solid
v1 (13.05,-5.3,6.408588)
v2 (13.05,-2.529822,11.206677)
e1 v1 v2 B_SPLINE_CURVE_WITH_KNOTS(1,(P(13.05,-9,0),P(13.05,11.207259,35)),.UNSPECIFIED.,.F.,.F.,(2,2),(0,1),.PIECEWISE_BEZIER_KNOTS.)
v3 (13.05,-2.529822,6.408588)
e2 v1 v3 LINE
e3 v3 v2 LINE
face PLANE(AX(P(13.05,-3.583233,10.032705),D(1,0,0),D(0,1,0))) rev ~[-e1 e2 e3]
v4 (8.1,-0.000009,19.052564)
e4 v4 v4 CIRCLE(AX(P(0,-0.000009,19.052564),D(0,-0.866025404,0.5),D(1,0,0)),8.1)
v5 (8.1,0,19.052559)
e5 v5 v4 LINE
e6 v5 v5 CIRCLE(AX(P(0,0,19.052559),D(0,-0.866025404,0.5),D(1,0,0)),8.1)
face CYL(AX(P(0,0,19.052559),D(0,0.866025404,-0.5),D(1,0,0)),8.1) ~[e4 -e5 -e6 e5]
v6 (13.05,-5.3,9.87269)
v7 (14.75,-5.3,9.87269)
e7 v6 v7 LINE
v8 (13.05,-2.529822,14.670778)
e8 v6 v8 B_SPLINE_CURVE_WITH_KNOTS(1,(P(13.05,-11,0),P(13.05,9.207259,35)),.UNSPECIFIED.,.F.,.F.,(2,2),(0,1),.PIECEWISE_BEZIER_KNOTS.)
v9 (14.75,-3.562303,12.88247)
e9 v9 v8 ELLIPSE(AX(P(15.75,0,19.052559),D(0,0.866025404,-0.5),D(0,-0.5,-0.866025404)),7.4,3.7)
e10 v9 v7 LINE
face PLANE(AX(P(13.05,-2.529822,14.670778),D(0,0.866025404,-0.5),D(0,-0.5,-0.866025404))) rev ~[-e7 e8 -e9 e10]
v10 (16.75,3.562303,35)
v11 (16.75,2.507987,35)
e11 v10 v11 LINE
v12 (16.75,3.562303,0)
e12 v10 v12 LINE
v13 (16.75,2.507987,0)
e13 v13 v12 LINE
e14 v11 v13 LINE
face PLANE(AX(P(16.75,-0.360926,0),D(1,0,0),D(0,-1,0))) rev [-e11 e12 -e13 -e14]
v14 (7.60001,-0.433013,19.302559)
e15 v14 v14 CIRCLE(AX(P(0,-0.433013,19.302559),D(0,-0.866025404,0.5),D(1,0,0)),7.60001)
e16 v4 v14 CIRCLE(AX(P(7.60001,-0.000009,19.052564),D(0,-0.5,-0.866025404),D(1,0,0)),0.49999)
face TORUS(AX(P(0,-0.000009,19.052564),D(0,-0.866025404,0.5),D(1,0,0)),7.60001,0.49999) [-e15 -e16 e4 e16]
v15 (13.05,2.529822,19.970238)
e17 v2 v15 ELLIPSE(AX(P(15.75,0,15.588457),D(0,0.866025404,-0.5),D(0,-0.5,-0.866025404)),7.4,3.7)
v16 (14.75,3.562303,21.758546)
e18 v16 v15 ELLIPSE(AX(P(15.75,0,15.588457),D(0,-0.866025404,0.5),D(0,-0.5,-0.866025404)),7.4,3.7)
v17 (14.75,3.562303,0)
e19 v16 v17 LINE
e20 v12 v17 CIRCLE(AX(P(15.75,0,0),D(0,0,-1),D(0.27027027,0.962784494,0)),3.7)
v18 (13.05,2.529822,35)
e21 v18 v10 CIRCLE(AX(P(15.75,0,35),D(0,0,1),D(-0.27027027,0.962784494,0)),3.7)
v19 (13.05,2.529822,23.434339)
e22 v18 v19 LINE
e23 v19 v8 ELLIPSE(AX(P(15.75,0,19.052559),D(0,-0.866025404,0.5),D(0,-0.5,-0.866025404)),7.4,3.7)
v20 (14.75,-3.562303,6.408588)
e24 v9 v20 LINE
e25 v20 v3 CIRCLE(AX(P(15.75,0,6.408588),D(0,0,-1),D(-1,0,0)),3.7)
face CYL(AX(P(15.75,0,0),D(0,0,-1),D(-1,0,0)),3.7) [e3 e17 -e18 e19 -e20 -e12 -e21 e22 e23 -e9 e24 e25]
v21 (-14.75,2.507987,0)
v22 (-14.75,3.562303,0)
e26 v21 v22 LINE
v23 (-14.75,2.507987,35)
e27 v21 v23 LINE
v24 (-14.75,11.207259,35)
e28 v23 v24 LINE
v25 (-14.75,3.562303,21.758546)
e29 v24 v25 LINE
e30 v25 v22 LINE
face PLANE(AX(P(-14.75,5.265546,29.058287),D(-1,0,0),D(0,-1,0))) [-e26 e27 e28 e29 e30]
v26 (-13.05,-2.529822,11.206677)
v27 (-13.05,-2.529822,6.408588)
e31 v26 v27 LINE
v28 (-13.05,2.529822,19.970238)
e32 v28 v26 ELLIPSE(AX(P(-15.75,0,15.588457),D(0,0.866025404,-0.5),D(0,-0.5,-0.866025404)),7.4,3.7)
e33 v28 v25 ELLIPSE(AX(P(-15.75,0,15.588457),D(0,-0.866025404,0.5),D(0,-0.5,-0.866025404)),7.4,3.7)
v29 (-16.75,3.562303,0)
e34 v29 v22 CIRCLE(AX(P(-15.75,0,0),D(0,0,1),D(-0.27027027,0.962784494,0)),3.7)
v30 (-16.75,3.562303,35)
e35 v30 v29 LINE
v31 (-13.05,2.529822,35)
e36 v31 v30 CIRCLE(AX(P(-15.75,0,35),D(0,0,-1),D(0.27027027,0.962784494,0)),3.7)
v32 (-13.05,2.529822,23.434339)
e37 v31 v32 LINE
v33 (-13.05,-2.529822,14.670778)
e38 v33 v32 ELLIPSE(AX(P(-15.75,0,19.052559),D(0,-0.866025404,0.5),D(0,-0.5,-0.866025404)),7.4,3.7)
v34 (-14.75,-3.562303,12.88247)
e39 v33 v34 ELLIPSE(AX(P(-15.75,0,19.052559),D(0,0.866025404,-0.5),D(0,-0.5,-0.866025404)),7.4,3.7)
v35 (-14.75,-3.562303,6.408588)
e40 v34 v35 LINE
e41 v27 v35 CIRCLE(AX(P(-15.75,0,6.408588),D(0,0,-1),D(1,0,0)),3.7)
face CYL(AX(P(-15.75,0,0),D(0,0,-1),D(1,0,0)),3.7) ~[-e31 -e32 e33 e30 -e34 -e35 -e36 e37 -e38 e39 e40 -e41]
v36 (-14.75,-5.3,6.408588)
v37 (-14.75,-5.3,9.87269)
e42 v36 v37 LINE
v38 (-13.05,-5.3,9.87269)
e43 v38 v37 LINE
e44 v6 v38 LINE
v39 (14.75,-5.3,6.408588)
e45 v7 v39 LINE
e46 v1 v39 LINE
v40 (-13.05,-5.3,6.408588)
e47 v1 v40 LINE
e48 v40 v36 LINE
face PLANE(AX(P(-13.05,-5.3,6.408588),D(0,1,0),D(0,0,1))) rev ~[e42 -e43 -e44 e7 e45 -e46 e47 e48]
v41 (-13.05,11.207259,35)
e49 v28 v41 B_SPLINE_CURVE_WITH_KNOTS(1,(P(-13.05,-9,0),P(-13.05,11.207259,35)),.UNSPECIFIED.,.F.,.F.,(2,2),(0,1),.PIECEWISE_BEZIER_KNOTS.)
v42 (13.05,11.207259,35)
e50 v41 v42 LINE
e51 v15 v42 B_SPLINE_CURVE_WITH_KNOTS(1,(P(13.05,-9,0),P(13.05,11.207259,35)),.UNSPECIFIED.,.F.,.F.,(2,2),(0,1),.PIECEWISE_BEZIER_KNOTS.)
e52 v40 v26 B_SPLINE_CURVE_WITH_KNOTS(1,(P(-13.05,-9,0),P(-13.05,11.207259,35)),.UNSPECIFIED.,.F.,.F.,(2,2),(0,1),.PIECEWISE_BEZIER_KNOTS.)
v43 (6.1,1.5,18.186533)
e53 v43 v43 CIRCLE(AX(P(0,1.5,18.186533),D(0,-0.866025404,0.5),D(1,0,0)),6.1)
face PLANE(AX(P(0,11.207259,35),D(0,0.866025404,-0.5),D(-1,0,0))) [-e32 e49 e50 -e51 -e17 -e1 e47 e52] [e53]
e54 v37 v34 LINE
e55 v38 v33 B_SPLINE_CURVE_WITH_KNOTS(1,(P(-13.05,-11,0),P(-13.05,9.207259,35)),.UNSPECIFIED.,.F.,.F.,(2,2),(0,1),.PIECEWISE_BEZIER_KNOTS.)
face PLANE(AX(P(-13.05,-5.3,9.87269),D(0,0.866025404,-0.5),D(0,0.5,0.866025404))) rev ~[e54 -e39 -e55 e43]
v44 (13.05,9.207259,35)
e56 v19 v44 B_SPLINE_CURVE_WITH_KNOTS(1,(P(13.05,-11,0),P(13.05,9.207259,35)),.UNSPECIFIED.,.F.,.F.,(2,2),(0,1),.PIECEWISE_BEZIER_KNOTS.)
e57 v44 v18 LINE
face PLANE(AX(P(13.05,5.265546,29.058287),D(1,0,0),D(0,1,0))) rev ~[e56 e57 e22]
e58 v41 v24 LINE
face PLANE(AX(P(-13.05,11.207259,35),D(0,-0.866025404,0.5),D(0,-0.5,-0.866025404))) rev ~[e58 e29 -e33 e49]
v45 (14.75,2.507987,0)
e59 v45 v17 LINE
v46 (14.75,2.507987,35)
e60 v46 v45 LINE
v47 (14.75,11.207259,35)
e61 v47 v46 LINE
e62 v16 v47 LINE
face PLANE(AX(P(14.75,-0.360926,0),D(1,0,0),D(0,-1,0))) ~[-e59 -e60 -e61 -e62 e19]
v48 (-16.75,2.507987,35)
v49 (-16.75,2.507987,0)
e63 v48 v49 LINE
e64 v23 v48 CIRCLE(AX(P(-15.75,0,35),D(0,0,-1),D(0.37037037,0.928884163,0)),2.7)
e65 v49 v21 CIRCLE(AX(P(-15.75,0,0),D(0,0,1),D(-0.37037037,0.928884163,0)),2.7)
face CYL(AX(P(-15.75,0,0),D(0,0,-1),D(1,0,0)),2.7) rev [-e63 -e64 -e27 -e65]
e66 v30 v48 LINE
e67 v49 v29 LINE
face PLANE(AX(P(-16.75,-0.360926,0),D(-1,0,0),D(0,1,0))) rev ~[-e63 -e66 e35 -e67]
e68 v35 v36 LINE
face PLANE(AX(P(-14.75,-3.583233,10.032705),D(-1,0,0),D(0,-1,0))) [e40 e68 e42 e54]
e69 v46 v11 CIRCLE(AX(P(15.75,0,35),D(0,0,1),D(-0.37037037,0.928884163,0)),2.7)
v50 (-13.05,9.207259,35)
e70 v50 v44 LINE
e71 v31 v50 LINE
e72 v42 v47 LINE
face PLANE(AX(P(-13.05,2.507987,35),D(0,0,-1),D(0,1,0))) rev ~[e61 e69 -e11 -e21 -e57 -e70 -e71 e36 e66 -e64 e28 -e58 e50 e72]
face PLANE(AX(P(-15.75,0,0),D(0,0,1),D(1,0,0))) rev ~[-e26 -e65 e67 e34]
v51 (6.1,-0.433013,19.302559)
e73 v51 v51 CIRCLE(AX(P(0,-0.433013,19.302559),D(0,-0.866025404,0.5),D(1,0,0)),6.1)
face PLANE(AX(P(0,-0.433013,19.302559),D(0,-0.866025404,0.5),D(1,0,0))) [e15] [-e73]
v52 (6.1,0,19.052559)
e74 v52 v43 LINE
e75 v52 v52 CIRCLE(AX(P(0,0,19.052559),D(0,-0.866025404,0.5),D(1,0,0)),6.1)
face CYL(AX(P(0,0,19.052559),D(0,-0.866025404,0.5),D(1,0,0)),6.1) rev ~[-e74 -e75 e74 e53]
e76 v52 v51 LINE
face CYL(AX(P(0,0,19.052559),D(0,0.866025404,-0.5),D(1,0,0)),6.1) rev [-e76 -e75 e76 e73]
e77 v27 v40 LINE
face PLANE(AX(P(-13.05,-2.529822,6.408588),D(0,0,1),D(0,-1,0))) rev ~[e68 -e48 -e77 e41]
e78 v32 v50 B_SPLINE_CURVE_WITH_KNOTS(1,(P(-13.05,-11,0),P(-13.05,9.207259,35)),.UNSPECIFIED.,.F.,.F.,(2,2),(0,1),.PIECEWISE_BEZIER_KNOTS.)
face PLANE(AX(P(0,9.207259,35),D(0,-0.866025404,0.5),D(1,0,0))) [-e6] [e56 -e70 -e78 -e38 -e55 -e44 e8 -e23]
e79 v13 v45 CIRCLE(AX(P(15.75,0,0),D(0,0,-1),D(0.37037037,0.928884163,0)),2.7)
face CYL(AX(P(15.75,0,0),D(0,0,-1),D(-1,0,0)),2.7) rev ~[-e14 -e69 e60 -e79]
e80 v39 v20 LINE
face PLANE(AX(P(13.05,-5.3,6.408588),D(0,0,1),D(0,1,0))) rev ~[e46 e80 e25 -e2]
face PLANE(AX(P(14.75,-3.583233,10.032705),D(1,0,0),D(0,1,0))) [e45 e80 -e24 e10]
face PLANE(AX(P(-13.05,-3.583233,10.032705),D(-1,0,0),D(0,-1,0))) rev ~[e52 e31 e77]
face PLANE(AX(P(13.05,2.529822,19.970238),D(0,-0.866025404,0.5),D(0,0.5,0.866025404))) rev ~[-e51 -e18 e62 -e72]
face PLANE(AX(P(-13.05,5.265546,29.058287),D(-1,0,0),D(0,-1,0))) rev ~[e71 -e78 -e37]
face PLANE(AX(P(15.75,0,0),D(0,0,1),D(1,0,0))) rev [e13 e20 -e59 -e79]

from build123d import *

# Parameters (mm, degrees)
F0_R      = 3.7
F0_R_2    = 2.7
F1_DEPTH  = 35
F2_W      = 2
F2_H      = 6.1218521535
F3_DEPTH  = 35.001
F6_W      = 26.1
F6_H      = 2
F8_W      = 26.1
F8_H      = 2
F11_DEPTH = 1.7
F13_DEPTH = 1.7
F14_R     = 6.1
F15_DEPTH = 19.2330509442
F14_R_2   = 8.1
F16_DEPTH = 0.5
F17_R     = 0.49999
F19_DEPTH = 26.1
F21_DEPTH = 1.7
F23_DEPTH = 1.7


# Not quite as in the source:
# - a fillet or chamfer is up to 0.001 mm smaller than in the source, because OpenCascade refuses the exact size


with BuildPart() as f1:
    # F0 (on Top) → F1 (new body)
    with BuildSketch(Plane.XY):
        with Locations((-15.75, 0)):
            Circle(F0_R)
        with Locations((-15.75, 0)):
            Circle(F0_R_2, mode=Mode.SUBTRACT)
    extrude(amount=F1_DEPTH)

    # F2 (on Top) → F3 (cut, through all)
    with BuildSketch(Plane.XY):
        with Locations((-15.75, 2.7)):
            Rectangle(F2_W, F2_H)
    extrude(amount=F3_DEPTH, mode=Mode.SUBTRACT)


with BuildPart() as f5_1:
    # F5: instance of F1
    add(f1.part.mirror(Plane.YZ))


with BuildPart() as f1_1:
    add(f1.part)

    add(f5_1.part)  # F9 merges F5_1
    # F6 (on Top) → F9 section 0
    with BuildSketch(Plane.XY):
        with Locations((0, -10)):
            Rectangle(F6_W, F6_H)
    # F8 (on offset) → F9 section 1
    with BuildSketch(Plane.XY.offset(35)):
        with Locations((0, 10.2072594216)):
            Rectangle(F8_W, F8_H)
    loft()

    # F10 (on face) → F11 (join, through all)
    with BuildSketch(Plane.YZ.offset(13.05)):
        Polygon((2.5079872408, 19.9324185939), (2.5298221281, 19.9702377282), (11.2072594216, 35), (2.5079872408, 35), align=None)
    extrude(amount=F11_DEPTH)

    # F12 (on face) → F13 (join, through all)
    with BuildSketch(Plane(origin=(-13.05, 0, 0), x_dir=(0, -1, 0), z_dir=(-1, 0, 0))):
        Polygon((-11.2072594216, 35), (-2.5298221281, 19.9702377282), (-2.5079872408, 19.9324185939), (-2.5079872408, 35), align=None)
    extrude(amount=F13_DEPTH)

    # F14 (on face) → F15 (cut, through all)
    with BuildSketch(Plane(origin=(0, -8.25, 4.7631397208), x_dir=(1, 0, 0), z_dir=(0, -0.8660254038, 0.5))):
        with Locations((0, 16.5)):
            Circle(F14_R)
    extrude(amount=-F15_DEPTH, mode=Mode.SUBTRACT)

    # F14 (on face) → F16 (join)
    with BuildSketch(Plane(origin=(0, -8.25, 4.7631397208), x_dir=(1, 0, 0), z_dir=(0, -0.8660254038, 0.5))):
        with Locations((0, 16.5)):
            Circle(F14_R_2)
        with Locations((0, 16.5)):
            Circle(F14_R, mode=Mode.SUBTRACT)
    extrude(amount=F16_DEPTH)

    # F17 (radius 0.5 in the source; OpenCascade refuses exactly that, so slightly less here)
    f17_edges = [f1_1.edges().sort_by_distance(p)[0] for p in [
        (-8.1, -0.433013, 19.302559),
    ]]
    fillet(f17_edges, radius=F17_R)

    # F18 (on face) → F19 (cut, through all)
    with BuildSketch(Plane.YZ.offset(13.05)):
        Polygon((-5.3, 9.8726896031), (-11, 0), (-9, 0), (-5.3, 6.408587988), align=None)
    extrude(amount=-F19_DEPTH, mode=Mode.SUBTRACT)

    # F20 (on face) → F21 (join, through all)
    with BuildSketch(Plane.YZ.offset(13.05)):
        Polygon((-2.5298221281, 14.6707784232), (-5.3, 9.8726896031), (-5.3, 6.408587988), (-2.5298221281, 6.408587988), align=None)
    extrude(amount=F21_DEPTH)

    # F22 (on face) → F23 (join, through all)
    with BuildSketch(Plane(origin=(-13.05, 0, 0), x_dir=(0, -1, 0), z_dir=(-1, 0, 0))):
        Polygon((5.3, 6.408587988), (5.3, 9.8726896031), (2.5298221281, 14.6707784232), (2.5298221281, 6.408587988), align=None)
    extrude(amount=F23_DEPTH)


solid = f1_1.part
